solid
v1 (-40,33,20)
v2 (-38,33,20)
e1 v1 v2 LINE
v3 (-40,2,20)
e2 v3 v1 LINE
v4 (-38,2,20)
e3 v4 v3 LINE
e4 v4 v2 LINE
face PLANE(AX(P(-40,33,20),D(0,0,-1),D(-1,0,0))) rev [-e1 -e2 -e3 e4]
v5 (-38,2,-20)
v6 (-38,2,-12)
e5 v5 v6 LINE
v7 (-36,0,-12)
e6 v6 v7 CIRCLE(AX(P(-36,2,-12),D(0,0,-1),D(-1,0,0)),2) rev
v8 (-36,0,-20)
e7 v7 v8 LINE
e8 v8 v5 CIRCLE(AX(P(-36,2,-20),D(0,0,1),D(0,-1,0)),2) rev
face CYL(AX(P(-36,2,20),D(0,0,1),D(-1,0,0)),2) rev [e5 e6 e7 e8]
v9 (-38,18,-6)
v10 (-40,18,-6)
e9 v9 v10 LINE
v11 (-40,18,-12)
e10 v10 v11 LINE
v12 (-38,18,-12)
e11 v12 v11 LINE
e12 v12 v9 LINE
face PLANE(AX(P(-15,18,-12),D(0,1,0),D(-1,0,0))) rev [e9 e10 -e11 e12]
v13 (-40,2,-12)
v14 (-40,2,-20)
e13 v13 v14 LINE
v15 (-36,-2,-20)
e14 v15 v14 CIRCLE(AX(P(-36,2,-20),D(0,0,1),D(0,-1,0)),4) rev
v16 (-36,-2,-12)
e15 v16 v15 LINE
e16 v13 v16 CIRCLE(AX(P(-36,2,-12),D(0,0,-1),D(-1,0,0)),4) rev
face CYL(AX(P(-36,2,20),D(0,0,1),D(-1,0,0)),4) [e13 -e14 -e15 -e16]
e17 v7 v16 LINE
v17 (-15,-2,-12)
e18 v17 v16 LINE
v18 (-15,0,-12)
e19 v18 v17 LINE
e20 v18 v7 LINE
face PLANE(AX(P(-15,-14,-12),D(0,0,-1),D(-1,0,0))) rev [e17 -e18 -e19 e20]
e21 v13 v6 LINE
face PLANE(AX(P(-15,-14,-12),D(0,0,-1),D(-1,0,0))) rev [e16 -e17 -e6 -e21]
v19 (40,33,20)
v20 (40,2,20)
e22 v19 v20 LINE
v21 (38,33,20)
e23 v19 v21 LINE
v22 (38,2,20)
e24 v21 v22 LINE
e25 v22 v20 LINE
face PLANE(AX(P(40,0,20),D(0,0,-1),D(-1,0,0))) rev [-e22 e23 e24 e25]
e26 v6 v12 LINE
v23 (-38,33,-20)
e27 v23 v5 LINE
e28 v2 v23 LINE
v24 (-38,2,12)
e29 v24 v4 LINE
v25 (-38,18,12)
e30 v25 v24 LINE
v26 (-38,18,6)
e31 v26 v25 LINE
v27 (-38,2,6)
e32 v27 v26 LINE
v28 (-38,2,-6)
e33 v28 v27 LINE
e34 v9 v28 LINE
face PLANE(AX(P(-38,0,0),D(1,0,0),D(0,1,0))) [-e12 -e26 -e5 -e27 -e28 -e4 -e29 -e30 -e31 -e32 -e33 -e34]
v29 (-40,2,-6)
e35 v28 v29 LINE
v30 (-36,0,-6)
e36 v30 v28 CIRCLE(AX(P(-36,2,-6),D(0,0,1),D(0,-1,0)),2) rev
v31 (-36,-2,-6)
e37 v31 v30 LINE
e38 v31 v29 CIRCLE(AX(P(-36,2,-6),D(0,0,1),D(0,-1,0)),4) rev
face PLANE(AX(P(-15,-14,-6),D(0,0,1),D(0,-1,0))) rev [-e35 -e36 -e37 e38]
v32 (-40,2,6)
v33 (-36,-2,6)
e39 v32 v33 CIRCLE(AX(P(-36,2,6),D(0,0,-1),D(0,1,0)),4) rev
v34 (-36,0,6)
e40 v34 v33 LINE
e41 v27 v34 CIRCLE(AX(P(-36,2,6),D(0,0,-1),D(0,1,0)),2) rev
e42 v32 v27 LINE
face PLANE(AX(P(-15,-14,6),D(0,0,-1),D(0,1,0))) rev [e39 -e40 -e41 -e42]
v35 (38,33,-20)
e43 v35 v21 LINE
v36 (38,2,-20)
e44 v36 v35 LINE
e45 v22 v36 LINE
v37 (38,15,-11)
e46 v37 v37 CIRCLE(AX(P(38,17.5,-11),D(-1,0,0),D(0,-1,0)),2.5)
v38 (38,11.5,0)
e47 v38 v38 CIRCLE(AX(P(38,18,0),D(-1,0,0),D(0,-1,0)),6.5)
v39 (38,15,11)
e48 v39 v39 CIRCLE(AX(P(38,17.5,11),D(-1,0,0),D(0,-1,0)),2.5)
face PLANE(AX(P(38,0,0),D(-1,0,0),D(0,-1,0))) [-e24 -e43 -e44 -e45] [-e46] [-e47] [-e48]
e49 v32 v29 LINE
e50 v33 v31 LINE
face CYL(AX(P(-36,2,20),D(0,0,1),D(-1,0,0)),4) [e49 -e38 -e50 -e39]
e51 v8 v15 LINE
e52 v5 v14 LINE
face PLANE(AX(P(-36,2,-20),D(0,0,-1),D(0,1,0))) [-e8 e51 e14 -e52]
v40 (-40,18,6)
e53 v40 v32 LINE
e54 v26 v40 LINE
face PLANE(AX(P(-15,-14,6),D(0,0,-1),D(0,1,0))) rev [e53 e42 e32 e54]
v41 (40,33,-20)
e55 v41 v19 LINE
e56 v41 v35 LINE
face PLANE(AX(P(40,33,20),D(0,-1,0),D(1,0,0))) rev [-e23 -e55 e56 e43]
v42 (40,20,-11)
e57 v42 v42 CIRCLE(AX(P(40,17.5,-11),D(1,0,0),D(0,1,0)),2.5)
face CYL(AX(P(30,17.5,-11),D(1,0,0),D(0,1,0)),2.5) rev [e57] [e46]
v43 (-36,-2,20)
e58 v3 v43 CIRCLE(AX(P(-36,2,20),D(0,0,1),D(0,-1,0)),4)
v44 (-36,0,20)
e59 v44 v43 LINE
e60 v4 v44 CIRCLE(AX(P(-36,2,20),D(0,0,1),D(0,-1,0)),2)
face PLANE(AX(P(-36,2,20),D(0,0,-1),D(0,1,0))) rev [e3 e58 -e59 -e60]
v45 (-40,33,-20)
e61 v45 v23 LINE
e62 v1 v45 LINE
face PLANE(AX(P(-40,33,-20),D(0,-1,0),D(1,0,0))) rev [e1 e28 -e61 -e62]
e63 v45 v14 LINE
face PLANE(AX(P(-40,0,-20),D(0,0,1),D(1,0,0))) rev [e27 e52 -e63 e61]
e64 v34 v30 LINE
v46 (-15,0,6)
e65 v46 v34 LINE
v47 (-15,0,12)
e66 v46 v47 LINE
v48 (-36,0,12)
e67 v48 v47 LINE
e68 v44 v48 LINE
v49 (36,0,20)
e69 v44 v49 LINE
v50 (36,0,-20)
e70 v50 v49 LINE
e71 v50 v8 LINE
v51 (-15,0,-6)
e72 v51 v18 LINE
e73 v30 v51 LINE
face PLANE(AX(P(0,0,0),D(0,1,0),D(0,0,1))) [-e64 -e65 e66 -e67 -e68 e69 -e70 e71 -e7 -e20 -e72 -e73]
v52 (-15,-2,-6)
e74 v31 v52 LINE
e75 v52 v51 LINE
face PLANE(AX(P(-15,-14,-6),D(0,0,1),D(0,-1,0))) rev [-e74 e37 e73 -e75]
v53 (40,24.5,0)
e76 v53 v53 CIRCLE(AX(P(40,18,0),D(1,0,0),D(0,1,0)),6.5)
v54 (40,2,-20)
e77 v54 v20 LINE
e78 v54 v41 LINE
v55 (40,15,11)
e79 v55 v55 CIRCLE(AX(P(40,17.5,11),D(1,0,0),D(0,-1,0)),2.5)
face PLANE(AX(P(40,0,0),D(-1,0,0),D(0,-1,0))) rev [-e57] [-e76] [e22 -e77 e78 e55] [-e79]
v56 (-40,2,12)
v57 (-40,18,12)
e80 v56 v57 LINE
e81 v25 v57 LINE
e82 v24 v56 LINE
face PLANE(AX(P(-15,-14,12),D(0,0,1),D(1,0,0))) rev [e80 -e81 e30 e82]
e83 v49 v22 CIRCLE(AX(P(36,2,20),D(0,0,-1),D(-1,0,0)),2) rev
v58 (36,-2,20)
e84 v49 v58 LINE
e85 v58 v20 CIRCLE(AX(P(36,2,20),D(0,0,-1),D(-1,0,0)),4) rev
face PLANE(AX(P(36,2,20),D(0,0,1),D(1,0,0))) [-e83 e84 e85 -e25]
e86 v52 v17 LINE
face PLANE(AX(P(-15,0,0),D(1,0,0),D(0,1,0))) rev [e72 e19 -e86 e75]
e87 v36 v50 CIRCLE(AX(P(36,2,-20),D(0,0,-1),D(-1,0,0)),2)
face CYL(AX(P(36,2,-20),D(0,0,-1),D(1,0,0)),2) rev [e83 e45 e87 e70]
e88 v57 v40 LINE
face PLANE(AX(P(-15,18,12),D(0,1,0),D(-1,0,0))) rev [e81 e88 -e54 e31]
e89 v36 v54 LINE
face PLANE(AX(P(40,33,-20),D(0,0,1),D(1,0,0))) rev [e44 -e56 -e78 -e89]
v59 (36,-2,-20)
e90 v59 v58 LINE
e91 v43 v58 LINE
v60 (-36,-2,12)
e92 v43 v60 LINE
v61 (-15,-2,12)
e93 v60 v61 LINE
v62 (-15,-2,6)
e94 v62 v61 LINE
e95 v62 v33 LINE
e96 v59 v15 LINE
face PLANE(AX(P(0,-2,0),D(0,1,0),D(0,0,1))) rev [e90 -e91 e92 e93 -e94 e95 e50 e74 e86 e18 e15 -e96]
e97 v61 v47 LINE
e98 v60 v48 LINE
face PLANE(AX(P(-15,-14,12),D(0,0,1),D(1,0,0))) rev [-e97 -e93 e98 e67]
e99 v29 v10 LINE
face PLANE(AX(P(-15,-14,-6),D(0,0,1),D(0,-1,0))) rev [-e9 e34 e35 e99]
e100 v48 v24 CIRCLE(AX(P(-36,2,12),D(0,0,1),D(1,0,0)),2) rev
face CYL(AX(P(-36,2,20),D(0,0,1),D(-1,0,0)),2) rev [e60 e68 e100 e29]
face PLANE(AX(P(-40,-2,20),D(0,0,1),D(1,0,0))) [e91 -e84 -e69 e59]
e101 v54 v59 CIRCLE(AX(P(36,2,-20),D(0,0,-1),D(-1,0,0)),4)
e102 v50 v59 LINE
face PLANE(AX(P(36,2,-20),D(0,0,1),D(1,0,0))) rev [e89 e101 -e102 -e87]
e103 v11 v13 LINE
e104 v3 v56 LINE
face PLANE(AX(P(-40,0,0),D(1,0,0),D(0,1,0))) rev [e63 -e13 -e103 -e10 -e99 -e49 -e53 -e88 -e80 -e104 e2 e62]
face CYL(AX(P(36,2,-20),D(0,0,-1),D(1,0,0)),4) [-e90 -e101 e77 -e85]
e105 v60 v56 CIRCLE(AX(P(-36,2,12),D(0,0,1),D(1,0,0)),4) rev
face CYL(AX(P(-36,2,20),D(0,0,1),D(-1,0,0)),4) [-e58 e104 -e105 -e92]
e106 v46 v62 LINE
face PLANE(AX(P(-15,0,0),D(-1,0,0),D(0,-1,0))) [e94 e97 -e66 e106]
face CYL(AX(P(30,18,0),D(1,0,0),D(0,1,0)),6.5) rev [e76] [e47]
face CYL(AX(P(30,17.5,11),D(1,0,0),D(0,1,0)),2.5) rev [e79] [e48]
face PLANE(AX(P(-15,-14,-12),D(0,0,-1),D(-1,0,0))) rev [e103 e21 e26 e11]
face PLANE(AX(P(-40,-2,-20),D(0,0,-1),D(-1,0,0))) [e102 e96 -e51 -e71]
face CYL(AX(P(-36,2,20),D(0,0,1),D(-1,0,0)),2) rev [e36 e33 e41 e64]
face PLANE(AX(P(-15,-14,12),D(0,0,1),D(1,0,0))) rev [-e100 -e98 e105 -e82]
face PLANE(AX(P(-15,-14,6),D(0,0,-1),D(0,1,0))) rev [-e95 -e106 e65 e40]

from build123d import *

# Parameters (mm, degrees)
SKETCH1_W                      = 80
SKETCH1_H                      = 40
BASE_FLANGE1_DEPTH             = 2
EDGE_FLANGE1_STRIP_W           = 12
EDGE_FLANGE1_STRIP_H           = 2
EDGE_FLANGE1_STRIP_CUT_DEPTH   = 40
EDGE_FLANGE1_STRIP_2_W         = 12
EDGE_FLANGE1_STRIP_2_H         = 2
EDGE_FLANGE1_STRIP_CUT_2_DEPTH = 40
EDGE_FLANGE1_DEPTH             = 40
EDGE_FLANGE1_BEND_DEPTH        = 40
SKETCH14_R                     = 6.5
SKETCH14_R_2                   = 2.5
CUT_EXTRUDE1_DEPTH             = 10
SKETCH15_W                     = 6
SKETCH15_H                     = 32
CUT_EXTRUDE2_DEPTH             = 25


# Sheet-metal steps are written as plain solids
with BuildPart() as part:
    # Sketch1 → Base-Flange1 (new body)
    with BuildSketch(Plane(origin=(0, 0, 0), x_dir=(1, 0, 0), z_dir=(0, 1, 0))):
        Rectangle(SKETCH1_W, SKETCH1_H)
    extrude(amount=-BASE_FLANGE1_DEPTH)

    # Edge-Flange1 strip (across the edge) → Edge-Flange1 strip cut (cut)
    with BuildSketch(Plane(origin=(40, 0, 20), x_dir=(-1, 0, 0), z_dir=(0, 0, -1))):
        with Locations((-2, -1)):
            Rectangle(EDGE_FLANGE1_STRIP_W, EDGE_FLANGE1_STRIP_H)
    extrude(amount=EDGE_FLANGE1_STRIP_CUT_DEPTH, mode=Mode.SUBTRACT)

    # Edge-Flange1 strip 2 (across the edge) → Edge-Flange1 strip cut 2 (cut)
    with BuildSketch(Plane(origin=(-40, 0, -20), x_dir=(1, 0, 0), z_dir=(0, 0, 1))):
        with Locations((-2, -1)):
            Rectangle(EDGE_FLANGE1_STRIP_2_W, EDGE_FLANGE1_STRIP_2_H)
    extrude(amount=EDGE_FLANGE1_STRIP_CUT_2_DEPTH, mode=Mode.SUBTRACT)

    # Edge-Flange1 section (across the edge) → Edge-Flange1 (add)
    with BuildSketch(Plane(origin=(40, 0, 20), x_dir=(-1, 0, 0), z_dir=(0, 0, -1))):
        with BuildLine():
            Line((0, 2), (0, 33))
            Line((0, 33), (2, 33))
            Line((2, 33), (2, 2))
            ThreePointArc((2, 2), (2.585786438, 0.585786438), (4, 0))
            Line((4, 0), (4, -2))
            ThreePointArc((4, -2), (1.171572875, -0.828427125), (0, 2))
        make_face()
    extrude(amount=EDGE_FLANGE1_DEPTH)

    # Edge-Flange1 section 2 (across the edge) → Edge-Flange1 bend (add)
    with BuildSketch(Plane(origin=(-40, 0, -20), x_dir=(1, 0, 0), z_dir=(0, 0, 1))):
        with BuildLine():
            Line((0, 2), (0, 33))
            Line((0, 33), (2, 33))
            Line((2, 33), (2, 2))
            ThreePointArc((2, 2), (2.585786438, 0.585786438), (4, 0))
            Line((4, 0), (4, -2))
            ThreePointArc((4, -2), (1.171572875, -0.828427125), (0, 2))
        make_face()
    extrude(amount=EDGE_FLANGE1_BEND_DEPTH)

    # Sketch14 → Cut-Extrude1 (cut)
    with BuildSketch(Plane(origin=(40, 0, 0), x_dir=(0, 0, -1), z_dir=(1, 0, 0))):
        with Locations(Location((0, 18, 0), (0, 0, 90))):
            Circle(SKETCH14_R)
        with Locations(Location((11, 17.5, 0), (0, 0, 90))):
            Circle(SKETCH14_R_2)
        with Locations(Location((-11, 17.5, 0), (0, 0, 270))):
            Circle(SKETCH14_R_2)
    extrude(amount=-CUT_EXTRUDE1_DEPTH, mode=Mode.SUBTRACT)

    # Sketch15 → Cut-Extrude2 (cut)
    with BuildSketch(Plane.ZY.offset(40)):
        with Locations((-9, 2)):
            Rectangle(SKETCH15_W, SKETCH15_H)
        with Locations((9, 2)):
            Rectangle(SKETCH15_W, SKETCH15_H)
    extrude(amount=-CUT_EXTRUDE2_DEPTH, mode=Mode.SUBTRACT)


solid = part.part
